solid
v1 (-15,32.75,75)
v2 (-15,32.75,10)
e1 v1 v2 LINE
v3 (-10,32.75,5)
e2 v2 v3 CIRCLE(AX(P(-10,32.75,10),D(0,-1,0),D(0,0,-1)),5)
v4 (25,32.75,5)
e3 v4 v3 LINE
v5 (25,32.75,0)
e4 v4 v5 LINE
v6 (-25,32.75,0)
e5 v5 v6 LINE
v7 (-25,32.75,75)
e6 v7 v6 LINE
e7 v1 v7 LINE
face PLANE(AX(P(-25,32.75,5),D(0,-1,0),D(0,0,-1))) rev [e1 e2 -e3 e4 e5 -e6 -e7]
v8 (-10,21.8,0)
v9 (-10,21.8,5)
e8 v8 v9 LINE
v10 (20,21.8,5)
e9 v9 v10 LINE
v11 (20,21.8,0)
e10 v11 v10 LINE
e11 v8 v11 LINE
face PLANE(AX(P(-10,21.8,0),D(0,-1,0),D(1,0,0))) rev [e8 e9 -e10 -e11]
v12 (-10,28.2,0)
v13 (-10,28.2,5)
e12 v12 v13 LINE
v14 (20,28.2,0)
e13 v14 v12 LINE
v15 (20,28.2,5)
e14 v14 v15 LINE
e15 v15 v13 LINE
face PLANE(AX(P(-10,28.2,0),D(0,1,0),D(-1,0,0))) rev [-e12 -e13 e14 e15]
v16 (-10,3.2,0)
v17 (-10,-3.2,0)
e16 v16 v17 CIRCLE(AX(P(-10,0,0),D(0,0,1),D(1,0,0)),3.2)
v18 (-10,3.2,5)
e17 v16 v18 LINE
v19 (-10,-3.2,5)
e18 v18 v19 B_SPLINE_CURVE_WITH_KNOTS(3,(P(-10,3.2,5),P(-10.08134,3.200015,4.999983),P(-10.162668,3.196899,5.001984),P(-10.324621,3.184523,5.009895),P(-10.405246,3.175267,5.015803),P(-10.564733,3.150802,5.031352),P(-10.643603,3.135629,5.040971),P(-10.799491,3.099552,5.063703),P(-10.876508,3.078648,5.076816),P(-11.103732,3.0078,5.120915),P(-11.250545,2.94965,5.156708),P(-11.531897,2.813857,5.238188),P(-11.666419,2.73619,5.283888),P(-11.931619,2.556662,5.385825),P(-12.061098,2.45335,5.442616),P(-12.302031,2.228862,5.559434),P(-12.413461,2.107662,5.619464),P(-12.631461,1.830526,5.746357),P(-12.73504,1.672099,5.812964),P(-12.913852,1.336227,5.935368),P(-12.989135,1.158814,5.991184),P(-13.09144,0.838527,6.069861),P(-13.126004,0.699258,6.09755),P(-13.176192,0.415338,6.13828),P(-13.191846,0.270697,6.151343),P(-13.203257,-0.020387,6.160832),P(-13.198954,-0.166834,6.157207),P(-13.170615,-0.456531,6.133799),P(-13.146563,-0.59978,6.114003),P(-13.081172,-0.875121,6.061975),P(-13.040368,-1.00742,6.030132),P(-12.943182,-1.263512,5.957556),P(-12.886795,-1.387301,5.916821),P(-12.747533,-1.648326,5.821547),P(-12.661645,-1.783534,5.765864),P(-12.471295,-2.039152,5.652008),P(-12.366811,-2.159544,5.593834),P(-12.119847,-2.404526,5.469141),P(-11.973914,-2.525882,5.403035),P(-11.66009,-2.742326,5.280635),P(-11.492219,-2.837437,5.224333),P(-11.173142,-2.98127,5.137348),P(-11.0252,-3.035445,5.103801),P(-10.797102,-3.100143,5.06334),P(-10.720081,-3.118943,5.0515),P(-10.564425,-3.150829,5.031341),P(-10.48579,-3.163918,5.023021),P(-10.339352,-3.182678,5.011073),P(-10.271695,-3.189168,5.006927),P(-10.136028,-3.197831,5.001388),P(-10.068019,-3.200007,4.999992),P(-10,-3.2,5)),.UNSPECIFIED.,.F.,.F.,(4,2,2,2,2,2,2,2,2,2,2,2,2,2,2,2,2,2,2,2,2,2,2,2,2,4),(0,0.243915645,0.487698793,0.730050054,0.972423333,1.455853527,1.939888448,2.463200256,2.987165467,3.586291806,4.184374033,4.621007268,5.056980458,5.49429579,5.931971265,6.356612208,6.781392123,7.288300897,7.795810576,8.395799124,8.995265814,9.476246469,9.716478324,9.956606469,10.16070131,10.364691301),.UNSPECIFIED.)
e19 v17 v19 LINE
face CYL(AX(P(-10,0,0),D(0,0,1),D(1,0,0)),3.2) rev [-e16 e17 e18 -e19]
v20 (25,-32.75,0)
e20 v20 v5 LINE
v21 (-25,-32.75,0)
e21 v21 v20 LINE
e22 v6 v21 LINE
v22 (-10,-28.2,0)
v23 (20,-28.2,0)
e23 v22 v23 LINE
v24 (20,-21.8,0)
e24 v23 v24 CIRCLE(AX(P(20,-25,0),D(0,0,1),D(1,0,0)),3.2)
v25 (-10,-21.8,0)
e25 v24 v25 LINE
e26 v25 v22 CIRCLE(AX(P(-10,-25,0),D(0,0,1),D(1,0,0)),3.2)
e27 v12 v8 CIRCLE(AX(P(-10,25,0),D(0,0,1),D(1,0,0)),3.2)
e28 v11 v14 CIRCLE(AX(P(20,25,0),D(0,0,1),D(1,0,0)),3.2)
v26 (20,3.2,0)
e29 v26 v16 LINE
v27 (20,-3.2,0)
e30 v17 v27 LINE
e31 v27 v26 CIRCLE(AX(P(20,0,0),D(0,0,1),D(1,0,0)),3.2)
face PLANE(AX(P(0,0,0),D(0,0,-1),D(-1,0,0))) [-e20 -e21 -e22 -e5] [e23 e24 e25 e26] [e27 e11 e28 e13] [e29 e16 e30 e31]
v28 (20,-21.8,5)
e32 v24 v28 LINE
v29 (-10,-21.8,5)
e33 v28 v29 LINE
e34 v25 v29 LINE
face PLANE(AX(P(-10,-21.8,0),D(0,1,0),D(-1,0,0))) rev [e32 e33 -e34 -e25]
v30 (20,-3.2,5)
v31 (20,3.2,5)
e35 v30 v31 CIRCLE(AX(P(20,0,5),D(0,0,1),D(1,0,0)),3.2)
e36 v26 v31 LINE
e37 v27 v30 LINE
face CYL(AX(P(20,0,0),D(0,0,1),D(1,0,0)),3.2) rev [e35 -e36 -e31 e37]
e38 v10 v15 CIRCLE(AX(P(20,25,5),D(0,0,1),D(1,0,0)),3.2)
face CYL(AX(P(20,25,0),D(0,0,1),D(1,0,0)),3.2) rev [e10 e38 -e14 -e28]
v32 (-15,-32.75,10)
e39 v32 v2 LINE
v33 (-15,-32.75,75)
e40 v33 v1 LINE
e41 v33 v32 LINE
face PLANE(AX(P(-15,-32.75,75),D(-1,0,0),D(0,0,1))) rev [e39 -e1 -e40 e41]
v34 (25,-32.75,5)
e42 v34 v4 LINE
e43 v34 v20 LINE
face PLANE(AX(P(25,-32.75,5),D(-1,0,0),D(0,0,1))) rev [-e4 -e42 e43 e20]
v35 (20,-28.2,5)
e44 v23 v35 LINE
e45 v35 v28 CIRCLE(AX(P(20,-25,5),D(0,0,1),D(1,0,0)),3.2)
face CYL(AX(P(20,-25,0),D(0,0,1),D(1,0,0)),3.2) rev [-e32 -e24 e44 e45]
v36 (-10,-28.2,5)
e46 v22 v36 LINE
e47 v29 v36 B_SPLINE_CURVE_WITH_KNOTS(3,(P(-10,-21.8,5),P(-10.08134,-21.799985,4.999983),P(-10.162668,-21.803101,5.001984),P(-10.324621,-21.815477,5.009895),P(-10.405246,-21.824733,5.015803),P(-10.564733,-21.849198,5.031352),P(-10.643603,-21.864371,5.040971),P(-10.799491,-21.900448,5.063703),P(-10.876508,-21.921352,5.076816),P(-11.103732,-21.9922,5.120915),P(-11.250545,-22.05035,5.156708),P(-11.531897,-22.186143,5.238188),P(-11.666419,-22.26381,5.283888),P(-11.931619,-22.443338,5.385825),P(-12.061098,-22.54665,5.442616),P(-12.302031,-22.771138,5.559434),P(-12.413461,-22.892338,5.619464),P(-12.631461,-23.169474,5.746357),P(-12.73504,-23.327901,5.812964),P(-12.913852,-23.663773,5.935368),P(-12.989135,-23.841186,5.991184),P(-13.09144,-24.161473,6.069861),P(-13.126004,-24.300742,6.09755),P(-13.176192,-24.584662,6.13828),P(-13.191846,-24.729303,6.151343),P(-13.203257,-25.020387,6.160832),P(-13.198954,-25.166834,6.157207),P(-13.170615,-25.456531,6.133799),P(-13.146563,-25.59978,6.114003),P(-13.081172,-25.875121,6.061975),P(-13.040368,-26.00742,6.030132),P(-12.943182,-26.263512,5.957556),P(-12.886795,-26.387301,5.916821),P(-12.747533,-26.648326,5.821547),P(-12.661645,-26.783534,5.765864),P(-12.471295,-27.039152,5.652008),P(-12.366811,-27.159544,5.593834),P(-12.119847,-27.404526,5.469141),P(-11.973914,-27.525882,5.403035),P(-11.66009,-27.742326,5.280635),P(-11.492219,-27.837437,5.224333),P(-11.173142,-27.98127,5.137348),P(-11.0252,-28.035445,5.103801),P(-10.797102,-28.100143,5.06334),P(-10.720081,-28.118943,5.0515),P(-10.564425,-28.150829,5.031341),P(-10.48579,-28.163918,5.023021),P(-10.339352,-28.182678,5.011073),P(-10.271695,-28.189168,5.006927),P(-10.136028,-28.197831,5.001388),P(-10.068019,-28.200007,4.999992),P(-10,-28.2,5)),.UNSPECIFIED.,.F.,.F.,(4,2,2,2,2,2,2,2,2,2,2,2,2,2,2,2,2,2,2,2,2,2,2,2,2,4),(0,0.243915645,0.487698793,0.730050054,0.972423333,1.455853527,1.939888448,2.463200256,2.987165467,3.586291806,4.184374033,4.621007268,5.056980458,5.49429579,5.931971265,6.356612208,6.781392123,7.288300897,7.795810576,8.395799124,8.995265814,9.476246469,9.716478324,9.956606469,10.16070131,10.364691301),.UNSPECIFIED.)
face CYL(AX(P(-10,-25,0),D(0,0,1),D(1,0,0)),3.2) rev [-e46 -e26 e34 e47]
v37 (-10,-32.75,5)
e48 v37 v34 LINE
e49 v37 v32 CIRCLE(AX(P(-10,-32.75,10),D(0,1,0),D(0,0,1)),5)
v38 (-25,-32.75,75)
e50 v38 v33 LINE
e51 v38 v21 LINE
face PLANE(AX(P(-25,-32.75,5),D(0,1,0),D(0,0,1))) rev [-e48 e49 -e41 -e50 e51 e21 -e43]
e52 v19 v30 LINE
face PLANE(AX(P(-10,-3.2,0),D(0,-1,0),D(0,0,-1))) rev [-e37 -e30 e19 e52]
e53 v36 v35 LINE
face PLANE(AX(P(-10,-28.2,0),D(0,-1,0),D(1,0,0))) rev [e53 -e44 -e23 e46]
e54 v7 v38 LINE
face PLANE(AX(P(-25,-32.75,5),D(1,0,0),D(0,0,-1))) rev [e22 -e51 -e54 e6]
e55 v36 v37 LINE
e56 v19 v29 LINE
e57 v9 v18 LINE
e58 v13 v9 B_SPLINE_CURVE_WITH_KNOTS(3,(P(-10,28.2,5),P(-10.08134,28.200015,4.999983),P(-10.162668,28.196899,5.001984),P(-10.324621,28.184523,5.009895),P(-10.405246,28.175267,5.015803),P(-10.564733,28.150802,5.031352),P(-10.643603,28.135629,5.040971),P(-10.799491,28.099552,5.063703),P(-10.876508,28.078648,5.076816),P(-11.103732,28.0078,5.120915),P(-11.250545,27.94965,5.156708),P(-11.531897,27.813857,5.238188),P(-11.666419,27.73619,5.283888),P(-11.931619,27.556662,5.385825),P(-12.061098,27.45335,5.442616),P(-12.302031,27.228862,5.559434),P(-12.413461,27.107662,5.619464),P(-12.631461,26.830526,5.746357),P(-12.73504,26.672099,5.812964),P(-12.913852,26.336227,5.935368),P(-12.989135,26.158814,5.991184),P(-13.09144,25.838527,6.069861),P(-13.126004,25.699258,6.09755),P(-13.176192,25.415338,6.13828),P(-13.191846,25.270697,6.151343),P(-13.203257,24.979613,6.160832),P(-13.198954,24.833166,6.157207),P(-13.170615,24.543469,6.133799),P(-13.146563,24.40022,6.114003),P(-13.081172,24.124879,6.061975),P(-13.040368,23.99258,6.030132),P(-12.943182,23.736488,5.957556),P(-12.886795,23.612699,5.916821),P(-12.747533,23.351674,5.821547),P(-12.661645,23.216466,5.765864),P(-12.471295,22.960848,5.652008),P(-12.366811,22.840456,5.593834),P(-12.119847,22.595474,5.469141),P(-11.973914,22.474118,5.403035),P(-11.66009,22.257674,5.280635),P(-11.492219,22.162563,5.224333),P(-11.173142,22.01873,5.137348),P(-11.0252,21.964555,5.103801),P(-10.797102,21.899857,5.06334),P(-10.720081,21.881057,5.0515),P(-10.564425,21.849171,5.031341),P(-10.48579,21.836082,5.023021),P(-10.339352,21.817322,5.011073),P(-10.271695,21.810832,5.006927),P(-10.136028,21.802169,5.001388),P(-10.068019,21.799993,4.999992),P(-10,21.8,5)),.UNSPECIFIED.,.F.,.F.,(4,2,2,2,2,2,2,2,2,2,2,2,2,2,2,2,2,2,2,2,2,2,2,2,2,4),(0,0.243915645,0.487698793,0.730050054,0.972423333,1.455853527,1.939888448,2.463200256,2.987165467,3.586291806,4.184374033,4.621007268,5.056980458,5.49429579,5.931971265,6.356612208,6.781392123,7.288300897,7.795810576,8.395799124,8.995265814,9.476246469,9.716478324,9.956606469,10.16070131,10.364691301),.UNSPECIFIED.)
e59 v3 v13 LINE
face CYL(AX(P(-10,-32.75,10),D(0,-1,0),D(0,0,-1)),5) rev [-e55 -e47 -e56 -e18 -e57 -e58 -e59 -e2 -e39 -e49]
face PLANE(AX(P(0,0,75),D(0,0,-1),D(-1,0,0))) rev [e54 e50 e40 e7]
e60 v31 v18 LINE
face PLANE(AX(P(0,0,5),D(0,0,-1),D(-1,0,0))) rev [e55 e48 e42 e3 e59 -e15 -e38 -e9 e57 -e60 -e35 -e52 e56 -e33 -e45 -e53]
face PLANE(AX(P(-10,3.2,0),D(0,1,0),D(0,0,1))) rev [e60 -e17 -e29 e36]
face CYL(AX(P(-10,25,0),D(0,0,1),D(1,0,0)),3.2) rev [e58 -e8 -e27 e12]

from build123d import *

# Parameters (mm, degrees)
SKETCH_1_W          = 50
SKETCH_1_H          = 65.5
EXTRUDE_1_DEPTH     = 5
SKETCH_4_W          = 10
SKETCH_4_H          = 65.5
EXTRUDE_2_DEPTH     = 70
CUT_EXTRUDE_1_DEPTH = 5
FILLET_7_R          = 5


with BuildPart() as part:
    # 스케치1 → 보스-돌출1 (new body)
    with BuildSketch(Plane.XY):
        Rectangle(SKETCH_1_W, SKETCH_1_H)
    extrude(amount=EXTRUDE_1_DEPTH)

    # 스케치4 → 보스-돌출2 (add)
    with BuildSketch(Plane.XY.offset(5)):
        with Locations((-20, 0)):
            Rectangle(SKETCH_4_W, SKETCH_4_H)
    extrude(amount=EXTRUDE_2_DEPTH)

    # 스케치2 → 컷-돌출1 (cut)
    with BuildSketch(Plane.XY.offset(5)):
        with BuildLine():
            Line((-10, -28.2), (20, -28.2))
            ThreePointArc((20, -28.2), (23.2, -25), (20, -21.8))
            Line((20, -21.8), (-10, -21.8))
            ThreePointArc((-10, -21.8), (-13.2, -25), (-10, -28.2))
        make_face()
        with BuildLine():
            Line((-10, -3.2), (20, -3.2))
            ThreePointArc((20, -3.2), (23.2, 0), (20, 3.2))
            Line((20, 3.2), (-10, 3.2))
            ThreePointArc((-10, 3.2), (-13.2, 0), (-10, -3.2))
        make_face()
        with BuildLine():
            Line((-10, 21.8), (20, 21.8))
            ThreePointArc((20, 21.8), (23.2, 25), (20, 28.2))
            Line((20, 28.2), (-10, 28.2))
            ThreePointArc((-10, 28.2), (-13.2, 25), (-10, 21.8))
        make_face()
    extrude(amount=-CUT_EXTRUDE_1_DEPTH, mode=Mode.SUBTRACT)

    # 필렛7
    # the kernel refuses this fillet: 5 mm, written as the material it adds along each edge
    with BuildSketch(Plane(origin=(-15, -32.75, 5), x_dir=(0, 0, 1), z_dir=(0, 1, 0))) as fillet_7_piece_1_section:
        with BuildLine():
            CenterArc((FILLET_7_R, FILLET_7_R), FILLET_7_R, 180, 90)
            Line((0, FILLET_7_R), (0, 0))
            Line((0, 0), (FILLET_7_R, 0))
        make_face()
    fillet_7_piece_1 = extrude(amount=65.5, mode=Mode.PRIVATE)
    fillet_7_piece_1 = fillet_7_piece_1 - Plane(origin=(-10, -25, 6.131975571), x_dir=(0, 1, 0), z_dir=(0, 0, 1)) * Cylinder(3.2, 151, mode=Mode.PRIVATE)
    fillet_7_piece_1 = fillet_7_piece_1 - Plane(origin=(-10, 0, 6.131975571), x_dir=(0, 1, 0), z_dir=(0, 0, 1)) * Cylinder(3.2, 151, mode=Mode.PRIVATE)
    fillet_7_piece_1 = fillet_7_piece_1 - Plane(origin=(-10, 25, 6.131975571), x_dir=(0, 1, 0), z_dir=(0, 0, 1)) * Cylinder(3.2, 151, mode=Mode.PRIVATE)
    add(fillet_7_piece_1)


solid = part.part
